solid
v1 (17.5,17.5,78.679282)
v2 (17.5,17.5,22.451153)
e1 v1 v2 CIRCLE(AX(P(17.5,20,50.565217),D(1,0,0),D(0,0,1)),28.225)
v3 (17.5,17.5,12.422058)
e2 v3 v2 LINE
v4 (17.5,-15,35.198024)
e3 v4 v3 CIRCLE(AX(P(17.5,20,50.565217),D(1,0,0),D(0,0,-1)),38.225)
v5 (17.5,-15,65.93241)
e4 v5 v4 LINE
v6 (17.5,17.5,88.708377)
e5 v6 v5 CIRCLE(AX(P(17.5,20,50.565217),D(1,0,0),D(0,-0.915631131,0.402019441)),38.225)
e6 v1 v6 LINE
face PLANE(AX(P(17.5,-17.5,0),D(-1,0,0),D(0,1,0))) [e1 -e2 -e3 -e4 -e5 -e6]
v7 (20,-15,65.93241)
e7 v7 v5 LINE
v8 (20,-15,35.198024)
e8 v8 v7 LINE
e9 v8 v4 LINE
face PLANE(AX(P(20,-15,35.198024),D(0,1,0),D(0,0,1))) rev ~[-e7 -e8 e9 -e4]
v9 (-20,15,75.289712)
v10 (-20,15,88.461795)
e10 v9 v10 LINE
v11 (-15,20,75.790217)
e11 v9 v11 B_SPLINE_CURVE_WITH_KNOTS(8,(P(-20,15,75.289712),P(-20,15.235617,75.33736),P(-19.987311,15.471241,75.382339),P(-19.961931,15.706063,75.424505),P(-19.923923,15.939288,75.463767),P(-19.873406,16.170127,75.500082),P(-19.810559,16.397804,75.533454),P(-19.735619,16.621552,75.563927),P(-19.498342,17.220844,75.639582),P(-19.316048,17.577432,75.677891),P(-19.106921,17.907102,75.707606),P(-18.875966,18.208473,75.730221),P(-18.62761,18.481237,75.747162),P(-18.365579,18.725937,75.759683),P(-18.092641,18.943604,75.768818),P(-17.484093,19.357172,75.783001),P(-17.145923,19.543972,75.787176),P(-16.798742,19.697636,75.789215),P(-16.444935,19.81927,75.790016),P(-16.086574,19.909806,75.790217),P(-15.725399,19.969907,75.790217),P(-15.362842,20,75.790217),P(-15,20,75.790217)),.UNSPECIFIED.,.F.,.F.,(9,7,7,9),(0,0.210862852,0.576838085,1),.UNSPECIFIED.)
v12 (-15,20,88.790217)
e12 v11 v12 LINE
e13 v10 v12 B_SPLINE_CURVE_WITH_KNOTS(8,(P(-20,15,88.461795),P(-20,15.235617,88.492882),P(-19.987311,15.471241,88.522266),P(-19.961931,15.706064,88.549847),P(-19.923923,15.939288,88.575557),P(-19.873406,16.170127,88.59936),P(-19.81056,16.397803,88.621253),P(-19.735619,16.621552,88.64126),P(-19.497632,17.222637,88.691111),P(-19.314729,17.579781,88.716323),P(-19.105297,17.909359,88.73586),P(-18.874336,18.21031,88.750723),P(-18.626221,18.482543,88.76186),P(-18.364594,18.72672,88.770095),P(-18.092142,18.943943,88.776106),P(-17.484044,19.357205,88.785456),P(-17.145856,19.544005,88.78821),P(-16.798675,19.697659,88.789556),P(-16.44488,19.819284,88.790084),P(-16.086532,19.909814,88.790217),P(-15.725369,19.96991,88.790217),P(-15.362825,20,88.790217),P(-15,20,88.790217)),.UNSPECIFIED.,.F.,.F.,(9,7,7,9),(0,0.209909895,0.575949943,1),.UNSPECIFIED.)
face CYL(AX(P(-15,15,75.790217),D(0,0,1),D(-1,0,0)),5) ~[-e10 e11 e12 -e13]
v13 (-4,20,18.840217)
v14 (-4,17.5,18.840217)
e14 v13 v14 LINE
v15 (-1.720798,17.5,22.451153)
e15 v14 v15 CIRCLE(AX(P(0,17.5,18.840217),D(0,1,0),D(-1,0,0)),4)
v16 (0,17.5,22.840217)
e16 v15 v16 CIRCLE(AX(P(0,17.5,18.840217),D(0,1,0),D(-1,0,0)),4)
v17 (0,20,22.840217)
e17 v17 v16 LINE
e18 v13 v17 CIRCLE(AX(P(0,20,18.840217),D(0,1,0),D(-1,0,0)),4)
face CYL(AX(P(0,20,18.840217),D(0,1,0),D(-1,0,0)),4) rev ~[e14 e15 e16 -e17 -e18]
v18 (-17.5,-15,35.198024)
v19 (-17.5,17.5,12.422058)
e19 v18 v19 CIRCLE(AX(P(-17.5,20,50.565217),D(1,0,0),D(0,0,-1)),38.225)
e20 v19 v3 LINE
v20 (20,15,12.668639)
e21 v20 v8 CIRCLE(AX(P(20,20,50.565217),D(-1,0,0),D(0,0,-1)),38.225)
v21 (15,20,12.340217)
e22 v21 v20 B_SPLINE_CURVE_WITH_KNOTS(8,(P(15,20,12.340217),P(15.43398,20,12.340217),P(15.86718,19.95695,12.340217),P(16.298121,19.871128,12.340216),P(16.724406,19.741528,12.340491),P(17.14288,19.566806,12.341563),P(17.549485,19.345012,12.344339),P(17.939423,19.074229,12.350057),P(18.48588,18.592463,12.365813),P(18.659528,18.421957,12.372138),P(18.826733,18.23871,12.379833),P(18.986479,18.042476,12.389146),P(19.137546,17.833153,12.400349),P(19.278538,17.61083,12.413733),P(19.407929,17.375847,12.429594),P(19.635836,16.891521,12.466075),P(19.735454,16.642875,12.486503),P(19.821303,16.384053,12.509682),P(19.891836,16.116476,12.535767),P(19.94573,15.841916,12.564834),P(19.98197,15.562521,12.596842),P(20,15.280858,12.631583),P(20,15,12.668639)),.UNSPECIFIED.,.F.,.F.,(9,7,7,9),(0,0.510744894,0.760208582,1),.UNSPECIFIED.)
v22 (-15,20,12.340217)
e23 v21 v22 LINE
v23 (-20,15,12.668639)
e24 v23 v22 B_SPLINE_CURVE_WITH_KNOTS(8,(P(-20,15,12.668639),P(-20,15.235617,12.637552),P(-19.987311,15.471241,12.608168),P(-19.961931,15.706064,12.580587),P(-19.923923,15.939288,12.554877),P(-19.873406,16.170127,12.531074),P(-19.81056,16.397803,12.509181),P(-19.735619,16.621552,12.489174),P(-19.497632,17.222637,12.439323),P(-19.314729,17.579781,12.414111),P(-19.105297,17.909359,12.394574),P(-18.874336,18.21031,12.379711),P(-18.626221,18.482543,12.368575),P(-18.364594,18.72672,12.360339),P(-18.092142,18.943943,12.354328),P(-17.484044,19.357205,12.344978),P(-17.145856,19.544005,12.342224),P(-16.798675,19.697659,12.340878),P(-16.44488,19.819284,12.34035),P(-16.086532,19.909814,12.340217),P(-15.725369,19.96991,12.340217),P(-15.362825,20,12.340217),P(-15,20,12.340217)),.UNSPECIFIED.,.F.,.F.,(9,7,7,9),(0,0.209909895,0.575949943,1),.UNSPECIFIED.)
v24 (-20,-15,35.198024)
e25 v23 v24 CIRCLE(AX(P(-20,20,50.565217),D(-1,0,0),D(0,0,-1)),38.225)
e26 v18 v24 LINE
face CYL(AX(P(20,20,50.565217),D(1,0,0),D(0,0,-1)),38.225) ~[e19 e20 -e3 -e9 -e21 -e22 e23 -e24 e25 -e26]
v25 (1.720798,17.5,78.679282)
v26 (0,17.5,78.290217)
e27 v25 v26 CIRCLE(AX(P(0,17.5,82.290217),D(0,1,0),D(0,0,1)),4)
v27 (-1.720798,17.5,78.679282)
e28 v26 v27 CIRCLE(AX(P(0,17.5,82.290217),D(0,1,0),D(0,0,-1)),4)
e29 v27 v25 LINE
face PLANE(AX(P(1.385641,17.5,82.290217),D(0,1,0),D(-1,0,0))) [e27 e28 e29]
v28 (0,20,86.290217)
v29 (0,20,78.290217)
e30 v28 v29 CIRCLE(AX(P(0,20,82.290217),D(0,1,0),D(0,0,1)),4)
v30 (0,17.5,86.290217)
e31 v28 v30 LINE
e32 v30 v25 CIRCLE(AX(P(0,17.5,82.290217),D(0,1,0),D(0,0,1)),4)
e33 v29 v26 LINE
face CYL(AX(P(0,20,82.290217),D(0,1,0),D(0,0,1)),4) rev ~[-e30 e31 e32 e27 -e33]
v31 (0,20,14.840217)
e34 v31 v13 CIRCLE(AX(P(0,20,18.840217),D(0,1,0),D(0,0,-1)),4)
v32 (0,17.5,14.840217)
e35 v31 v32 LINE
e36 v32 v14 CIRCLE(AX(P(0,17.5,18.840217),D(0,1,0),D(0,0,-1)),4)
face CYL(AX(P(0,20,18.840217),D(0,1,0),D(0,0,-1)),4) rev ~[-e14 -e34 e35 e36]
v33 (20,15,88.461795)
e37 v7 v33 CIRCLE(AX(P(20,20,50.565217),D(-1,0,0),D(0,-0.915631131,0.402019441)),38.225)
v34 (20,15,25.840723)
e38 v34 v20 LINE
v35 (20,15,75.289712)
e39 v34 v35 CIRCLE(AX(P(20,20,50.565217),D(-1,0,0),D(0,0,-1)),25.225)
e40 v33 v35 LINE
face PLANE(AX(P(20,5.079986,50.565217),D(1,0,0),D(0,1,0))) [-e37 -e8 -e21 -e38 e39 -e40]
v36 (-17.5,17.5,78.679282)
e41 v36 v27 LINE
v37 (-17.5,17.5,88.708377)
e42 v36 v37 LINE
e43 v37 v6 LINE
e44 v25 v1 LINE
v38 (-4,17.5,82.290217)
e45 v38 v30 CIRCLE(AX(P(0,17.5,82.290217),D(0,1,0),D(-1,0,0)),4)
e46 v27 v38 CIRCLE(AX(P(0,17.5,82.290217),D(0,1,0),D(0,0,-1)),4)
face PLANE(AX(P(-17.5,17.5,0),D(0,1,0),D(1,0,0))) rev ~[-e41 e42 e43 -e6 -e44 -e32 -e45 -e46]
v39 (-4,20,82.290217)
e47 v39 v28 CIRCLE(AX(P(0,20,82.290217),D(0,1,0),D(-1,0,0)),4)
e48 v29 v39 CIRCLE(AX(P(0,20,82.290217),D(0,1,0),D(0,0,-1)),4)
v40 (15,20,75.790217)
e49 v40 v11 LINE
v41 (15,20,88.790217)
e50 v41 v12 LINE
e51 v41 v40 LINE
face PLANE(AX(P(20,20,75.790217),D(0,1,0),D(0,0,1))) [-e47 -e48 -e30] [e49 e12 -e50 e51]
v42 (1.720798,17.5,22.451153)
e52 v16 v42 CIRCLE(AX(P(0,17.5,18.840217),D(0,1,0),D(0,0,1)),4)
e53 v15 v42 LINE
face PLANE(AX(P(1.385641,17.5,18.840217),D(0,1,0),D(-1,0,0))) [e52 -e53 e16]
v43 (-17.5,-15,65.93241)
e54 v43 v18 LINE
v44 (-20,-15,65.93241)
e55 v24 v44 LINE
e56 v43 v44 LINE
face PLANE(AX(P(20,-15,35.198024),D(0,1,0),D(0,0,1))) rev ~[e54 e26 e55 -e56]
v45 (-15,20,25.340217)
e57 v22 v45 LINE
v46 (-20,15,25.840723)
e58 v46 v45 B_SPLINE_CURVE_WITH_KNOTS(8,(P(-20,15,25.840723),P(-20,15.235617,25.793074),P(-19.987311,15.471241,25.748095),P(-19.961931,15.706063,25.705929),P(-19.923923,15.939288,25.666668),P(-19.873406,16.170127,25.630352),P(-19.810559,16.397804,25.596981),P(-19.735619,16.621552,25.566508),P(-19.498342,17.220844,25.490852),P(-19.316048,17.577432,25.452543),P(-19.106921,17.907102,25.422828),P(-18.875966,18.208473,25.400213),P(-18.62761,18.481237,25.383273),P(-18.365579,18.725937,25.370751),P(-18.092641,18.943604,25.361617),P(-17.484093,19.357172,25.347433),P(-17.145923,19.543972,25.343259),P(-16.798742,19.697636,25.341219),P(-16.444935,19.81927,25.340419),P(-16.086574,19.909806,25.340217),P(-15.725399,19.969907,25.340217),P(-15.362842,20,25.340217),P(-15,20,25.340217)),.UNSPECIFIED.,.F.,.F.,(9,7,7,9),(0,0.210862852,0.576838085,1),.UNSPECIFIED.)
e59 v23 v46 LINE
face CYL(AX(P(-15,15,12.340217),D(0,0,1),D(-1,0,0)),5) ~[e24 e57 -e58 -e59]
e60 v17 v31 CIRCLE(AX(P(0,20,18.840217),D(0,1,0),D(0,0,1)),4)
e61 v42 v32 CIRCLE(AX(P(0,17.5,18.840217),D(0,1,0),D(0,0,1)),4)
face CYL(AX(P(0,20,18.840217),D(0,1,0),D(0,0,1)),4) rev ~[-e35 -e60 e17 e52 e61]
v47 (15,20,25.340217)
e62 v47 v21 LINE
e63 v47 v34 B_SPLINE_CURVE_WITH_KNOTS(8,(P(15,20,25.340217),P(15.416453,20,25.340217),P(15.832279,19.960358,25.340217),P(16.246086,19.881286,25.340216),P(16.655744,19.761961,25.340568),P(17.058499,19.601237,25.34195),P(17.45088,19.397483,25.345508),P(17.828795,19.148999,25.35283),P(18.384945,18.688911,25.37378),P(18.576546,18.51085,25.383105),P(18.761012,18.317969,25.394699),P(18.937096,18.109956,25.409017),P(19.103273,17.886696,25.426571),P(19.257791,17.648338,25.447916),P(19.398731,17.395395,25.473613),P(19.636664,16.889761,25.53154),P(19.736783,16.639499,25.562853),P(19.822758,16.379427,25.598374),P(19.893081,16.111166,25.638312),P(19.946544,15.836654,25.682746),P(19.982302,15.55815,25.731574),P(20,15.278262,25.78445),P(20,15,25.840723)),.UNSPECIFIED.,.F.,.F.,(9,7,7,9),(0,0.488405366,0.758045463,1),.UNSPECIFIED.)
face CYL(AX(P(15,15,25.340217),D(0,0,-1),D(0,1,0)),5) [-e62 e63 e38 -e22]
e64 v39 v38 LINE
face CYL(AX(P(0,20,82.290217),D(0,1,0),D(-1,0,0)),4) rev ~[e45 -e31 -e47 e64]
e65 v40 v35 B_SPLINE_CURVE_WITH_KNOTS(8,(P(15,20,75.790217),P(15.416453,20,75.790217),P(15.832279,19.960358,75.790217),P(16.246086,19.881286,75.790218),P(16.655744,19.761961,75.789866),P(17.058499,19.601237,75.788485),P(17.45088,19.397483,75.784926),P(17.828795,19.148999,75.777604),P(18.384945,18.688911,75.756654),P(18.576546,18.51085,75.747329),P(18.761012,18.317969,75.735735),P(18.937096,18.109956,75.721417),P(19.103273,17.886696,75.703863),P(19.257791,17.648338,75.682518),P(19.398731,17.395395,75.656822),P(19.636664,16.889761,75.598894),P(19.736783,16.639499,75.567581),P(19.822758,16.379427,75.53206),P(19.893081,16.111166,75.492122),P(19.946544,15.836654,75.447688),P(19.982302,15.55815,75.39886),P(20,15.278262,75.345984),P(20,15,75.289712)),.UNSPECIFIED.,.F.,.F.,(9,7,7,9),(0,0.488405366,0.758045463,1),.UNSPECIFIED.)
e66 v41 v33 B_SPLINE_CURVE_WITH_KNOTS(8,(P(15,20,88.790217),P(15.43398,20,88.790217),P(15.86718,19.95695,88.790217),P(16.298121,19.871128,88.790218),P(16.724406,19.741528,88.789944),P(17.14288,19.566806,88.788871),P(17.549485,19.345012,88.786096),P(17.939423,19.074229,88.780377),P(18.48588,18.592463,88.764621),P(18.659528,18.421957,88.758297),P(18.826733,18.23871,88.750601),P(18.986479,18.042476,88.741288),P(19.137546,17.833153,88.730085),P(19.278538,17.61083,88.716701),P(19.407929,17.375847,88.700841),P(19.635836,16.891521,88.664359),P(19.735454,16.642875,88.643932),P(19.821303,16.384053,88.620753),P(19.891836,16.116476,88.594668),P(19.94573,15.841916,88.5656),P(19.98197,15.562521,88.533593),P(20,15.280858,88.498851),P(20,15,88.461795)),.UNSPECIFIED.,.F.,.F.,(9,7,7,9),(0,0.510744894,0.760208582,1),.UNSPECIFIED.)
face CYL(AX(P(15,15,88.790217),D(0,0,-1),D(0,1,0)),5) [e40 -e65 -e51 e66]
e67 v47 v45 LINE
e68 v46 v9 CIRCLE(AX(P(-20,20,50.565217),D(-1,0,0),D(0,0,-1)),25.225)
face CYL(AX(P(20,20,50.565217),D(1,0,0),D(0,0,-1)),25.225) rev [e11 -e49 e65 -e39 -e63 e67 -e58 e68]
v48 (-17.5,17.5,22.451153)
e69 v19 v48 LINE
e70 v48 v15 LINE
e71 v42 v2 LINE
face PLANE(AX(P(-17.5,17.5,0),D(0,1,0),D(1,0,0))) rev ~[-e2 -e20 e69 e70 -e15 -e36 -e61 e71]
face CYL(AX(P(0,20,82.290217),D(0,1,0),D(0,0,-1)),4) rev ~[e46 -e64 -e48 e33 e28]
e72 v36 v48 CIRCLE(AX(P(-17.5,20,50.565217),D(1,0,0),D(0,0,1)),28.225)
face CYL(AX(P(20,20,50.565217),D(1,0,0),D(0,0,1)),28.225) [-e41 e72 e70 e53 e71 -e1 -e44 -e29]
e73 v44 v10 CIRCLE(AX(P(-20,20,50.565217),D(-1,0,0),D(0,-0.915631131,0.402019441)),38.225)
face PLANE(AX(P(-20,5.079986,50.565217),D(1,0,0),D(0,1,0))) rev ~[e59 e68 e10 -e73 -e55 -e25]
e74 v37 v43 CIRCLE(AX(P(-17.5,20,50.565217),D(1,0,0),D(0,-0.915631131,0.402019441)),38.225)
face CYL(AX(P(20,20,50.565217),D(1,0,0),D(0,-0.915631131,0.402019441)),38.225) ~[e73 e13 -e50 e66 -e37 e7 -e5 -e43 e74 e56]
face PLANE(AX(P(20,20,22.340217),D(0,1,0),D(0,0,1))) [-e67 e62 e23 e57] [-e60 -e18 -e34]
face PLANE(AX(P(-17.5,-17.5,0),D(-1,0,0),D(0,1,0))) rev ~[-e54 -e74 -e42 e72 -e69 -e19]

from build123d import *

# Parameters (mm, degrees)
F0_W      = 40
F0_H      = 40
F0_W_2    = 35
F0_H_2    = 35
F1_DEPTH  = 100
F3_DEPTH  = 40.001
F4_DEPTH  = 40
F5_R      = 5
F6_DEPTH  = 40
F7_R      = 5
F9_DEPTH  = 2.5
F11_DEPTH = 2.5


# Not quite as in the source:
# - a feature names something its author has since deleted; it is built from what else it names


with BuildPart() as f1:
    # F0 (on Top) → F1 (new body)
    with BuildSketch(Plane.XY):
        Rectangle(F0_W, F0_H)
        Rectangle(F0_W_2, F0_H_2, mode=Mode.SUBTRACT)
    extrude(amount=F1_DEPTH)

    # F2 (on face) → F3 (cut, through all)
    with BuildSketch(Plane.YZ.offset(20)):
        with BuildLine():
            Line((20, 25.3402171373), (20, 75.7902171373))
            ThreePointArc((20, 75.7902171373), (-5.225, 50.5652171373), (20, 25.3402171373))
        make_face()
        with BuildLine():
            ThreePointArc((20, 25.3402171373), (-5.225, 50.5652171373), (20, 75.7902171373))
            Line((20, 75.7902171373), (20, 78.7902171373))
            ThreePointArc((20, 78.7902171373), (-8.225, 50.5652171373), (20, 22.3402171373))
            Line((20, 22.3402171373), (20, 25.3402171373))
        make_face()
    extrude(amount=-F3_DEPTH, mode=Mode.SUBTRACT)

    # F2 (on face) → F4 (join)
    with BuildSketch(Plane.YZ.offset(20)):
        with BuildLine():
            ThreePointArc((20, 25.3402171373), (-5.225, 50.5652171373), (20, 75.7902171373))
            Line((20, 75.7902171373), (20, 78.7902171373))
            ThreePointArc((20, 78.7902171373), (-8.225, 50.5652171373), (20, 22.3402171373))
            Line((20, 22.3402171373), (20, 25.3402171373))
        make_face()
    extrude(amount=-F4_DEPTH)

    # F5
    f5_edges = [f1.edges().sort_by_distance(p)[0] for p in [
        (-20, -20, 50),
        (20, -20, 50),
    ]]
    fillet(f5_edges, radius=F5_R)

    # F2 (on face) → F6 (cut)
    with BuildSketch(Plane.YZ.offset(20)):
        with BuildLine():
            ThreePointArc((-15, 65.9324102773), (-0.9014313771, 82.569604202), (20, 88.7902171373))
            Line((20, 88.7902171373), (20, 100))
            Line((20, 100), (-20, 100))
            Line((-20, 100), (-20, 70.5652171373))
            Line((-20, 70.5652171373), (-20, 30.5652171373))
            Line((-20, 30.5652171373), (-20, 0))
            Line((-20, 0), (20, 0))
            Line((20, 0), (20, 12.3402171373))
            ThreePointArc((20, 12.3402171373), (-0.9014313771, 18.5608300726), (-15, 35.1980239974))
            Line((-15, 35.1980239974), (-15, 65.9324102773))
        make_face()
    extrude(amount=-F6_DEPTH, mode=Mode.SUBTRACT)

    # F7
    f7_edges = [f1.edges().sort_by_distance(p)[0] for p in [
        (-20, 20, 82.290217),
        (20, 20, 82.290217),
        (-20, 20, 18.840217),
        (20, 20, 18.840217),
    ]]
    fillet(f7_edges, radius=F7_R)

    # F8 (on face) → F9 (cut)
    with BuildSketch(Plane(origin=(0, 20, 0), x_dir=(-1, 0, 0), z_dir=(0, 1, 0))):
        with BuildLine():
            ThreePointArc((0, 86.2902171373), (-4, 82.2902171373), (0, 78.2902171373))
            Line((0, 78.2902171373), (0, 86.2902171373))
        make_face()
        with BuildLine():
            Line((0, 86.2902171373), (0, 78.2902171373))
            ThreePointArc((0, 78.2902171373), (2.8284271247, 79.4617900126), (4, 82.2902171373))
            ThreePointArc((4, 82.2902171373), (2.8284271247, 85.1186442621), (0, 86.2902171373))
        make_face()
    extrude(amount=-F9_DEPTH, mode=Mode.SUBTRACT)

    # F10 (on face) → F11 (cut)
    with BuildSketch(Plane(origin=(0, 20, 0), x_dir=(-1, 0, 0), z_dir=(0, 1, 0))):
        with BuildLine():
            ThreePointArc((0, 22.8402171373), (-4, 18.8402171373), (0, 14.8402171373))
            Line((0, 14.8402171373), (0, 22.8402171373))
        make_face()
        with BuildLine():
            Line((0, 22.8402171373), (0, 14.8402171373))
            ThreePointArc((0, 14.8402171373), (2.8284271247, 16.0117900126), (4, 18.8402171373))
            ThreePointArc((4, 18.8402171373), (2.8284271247, 21.6686442621), (0, 22.8402171373))
        make_face()
    extrude(amount=-F11_DEPTH, mode=Mode.SUBTRACT)


solid = f1.part
